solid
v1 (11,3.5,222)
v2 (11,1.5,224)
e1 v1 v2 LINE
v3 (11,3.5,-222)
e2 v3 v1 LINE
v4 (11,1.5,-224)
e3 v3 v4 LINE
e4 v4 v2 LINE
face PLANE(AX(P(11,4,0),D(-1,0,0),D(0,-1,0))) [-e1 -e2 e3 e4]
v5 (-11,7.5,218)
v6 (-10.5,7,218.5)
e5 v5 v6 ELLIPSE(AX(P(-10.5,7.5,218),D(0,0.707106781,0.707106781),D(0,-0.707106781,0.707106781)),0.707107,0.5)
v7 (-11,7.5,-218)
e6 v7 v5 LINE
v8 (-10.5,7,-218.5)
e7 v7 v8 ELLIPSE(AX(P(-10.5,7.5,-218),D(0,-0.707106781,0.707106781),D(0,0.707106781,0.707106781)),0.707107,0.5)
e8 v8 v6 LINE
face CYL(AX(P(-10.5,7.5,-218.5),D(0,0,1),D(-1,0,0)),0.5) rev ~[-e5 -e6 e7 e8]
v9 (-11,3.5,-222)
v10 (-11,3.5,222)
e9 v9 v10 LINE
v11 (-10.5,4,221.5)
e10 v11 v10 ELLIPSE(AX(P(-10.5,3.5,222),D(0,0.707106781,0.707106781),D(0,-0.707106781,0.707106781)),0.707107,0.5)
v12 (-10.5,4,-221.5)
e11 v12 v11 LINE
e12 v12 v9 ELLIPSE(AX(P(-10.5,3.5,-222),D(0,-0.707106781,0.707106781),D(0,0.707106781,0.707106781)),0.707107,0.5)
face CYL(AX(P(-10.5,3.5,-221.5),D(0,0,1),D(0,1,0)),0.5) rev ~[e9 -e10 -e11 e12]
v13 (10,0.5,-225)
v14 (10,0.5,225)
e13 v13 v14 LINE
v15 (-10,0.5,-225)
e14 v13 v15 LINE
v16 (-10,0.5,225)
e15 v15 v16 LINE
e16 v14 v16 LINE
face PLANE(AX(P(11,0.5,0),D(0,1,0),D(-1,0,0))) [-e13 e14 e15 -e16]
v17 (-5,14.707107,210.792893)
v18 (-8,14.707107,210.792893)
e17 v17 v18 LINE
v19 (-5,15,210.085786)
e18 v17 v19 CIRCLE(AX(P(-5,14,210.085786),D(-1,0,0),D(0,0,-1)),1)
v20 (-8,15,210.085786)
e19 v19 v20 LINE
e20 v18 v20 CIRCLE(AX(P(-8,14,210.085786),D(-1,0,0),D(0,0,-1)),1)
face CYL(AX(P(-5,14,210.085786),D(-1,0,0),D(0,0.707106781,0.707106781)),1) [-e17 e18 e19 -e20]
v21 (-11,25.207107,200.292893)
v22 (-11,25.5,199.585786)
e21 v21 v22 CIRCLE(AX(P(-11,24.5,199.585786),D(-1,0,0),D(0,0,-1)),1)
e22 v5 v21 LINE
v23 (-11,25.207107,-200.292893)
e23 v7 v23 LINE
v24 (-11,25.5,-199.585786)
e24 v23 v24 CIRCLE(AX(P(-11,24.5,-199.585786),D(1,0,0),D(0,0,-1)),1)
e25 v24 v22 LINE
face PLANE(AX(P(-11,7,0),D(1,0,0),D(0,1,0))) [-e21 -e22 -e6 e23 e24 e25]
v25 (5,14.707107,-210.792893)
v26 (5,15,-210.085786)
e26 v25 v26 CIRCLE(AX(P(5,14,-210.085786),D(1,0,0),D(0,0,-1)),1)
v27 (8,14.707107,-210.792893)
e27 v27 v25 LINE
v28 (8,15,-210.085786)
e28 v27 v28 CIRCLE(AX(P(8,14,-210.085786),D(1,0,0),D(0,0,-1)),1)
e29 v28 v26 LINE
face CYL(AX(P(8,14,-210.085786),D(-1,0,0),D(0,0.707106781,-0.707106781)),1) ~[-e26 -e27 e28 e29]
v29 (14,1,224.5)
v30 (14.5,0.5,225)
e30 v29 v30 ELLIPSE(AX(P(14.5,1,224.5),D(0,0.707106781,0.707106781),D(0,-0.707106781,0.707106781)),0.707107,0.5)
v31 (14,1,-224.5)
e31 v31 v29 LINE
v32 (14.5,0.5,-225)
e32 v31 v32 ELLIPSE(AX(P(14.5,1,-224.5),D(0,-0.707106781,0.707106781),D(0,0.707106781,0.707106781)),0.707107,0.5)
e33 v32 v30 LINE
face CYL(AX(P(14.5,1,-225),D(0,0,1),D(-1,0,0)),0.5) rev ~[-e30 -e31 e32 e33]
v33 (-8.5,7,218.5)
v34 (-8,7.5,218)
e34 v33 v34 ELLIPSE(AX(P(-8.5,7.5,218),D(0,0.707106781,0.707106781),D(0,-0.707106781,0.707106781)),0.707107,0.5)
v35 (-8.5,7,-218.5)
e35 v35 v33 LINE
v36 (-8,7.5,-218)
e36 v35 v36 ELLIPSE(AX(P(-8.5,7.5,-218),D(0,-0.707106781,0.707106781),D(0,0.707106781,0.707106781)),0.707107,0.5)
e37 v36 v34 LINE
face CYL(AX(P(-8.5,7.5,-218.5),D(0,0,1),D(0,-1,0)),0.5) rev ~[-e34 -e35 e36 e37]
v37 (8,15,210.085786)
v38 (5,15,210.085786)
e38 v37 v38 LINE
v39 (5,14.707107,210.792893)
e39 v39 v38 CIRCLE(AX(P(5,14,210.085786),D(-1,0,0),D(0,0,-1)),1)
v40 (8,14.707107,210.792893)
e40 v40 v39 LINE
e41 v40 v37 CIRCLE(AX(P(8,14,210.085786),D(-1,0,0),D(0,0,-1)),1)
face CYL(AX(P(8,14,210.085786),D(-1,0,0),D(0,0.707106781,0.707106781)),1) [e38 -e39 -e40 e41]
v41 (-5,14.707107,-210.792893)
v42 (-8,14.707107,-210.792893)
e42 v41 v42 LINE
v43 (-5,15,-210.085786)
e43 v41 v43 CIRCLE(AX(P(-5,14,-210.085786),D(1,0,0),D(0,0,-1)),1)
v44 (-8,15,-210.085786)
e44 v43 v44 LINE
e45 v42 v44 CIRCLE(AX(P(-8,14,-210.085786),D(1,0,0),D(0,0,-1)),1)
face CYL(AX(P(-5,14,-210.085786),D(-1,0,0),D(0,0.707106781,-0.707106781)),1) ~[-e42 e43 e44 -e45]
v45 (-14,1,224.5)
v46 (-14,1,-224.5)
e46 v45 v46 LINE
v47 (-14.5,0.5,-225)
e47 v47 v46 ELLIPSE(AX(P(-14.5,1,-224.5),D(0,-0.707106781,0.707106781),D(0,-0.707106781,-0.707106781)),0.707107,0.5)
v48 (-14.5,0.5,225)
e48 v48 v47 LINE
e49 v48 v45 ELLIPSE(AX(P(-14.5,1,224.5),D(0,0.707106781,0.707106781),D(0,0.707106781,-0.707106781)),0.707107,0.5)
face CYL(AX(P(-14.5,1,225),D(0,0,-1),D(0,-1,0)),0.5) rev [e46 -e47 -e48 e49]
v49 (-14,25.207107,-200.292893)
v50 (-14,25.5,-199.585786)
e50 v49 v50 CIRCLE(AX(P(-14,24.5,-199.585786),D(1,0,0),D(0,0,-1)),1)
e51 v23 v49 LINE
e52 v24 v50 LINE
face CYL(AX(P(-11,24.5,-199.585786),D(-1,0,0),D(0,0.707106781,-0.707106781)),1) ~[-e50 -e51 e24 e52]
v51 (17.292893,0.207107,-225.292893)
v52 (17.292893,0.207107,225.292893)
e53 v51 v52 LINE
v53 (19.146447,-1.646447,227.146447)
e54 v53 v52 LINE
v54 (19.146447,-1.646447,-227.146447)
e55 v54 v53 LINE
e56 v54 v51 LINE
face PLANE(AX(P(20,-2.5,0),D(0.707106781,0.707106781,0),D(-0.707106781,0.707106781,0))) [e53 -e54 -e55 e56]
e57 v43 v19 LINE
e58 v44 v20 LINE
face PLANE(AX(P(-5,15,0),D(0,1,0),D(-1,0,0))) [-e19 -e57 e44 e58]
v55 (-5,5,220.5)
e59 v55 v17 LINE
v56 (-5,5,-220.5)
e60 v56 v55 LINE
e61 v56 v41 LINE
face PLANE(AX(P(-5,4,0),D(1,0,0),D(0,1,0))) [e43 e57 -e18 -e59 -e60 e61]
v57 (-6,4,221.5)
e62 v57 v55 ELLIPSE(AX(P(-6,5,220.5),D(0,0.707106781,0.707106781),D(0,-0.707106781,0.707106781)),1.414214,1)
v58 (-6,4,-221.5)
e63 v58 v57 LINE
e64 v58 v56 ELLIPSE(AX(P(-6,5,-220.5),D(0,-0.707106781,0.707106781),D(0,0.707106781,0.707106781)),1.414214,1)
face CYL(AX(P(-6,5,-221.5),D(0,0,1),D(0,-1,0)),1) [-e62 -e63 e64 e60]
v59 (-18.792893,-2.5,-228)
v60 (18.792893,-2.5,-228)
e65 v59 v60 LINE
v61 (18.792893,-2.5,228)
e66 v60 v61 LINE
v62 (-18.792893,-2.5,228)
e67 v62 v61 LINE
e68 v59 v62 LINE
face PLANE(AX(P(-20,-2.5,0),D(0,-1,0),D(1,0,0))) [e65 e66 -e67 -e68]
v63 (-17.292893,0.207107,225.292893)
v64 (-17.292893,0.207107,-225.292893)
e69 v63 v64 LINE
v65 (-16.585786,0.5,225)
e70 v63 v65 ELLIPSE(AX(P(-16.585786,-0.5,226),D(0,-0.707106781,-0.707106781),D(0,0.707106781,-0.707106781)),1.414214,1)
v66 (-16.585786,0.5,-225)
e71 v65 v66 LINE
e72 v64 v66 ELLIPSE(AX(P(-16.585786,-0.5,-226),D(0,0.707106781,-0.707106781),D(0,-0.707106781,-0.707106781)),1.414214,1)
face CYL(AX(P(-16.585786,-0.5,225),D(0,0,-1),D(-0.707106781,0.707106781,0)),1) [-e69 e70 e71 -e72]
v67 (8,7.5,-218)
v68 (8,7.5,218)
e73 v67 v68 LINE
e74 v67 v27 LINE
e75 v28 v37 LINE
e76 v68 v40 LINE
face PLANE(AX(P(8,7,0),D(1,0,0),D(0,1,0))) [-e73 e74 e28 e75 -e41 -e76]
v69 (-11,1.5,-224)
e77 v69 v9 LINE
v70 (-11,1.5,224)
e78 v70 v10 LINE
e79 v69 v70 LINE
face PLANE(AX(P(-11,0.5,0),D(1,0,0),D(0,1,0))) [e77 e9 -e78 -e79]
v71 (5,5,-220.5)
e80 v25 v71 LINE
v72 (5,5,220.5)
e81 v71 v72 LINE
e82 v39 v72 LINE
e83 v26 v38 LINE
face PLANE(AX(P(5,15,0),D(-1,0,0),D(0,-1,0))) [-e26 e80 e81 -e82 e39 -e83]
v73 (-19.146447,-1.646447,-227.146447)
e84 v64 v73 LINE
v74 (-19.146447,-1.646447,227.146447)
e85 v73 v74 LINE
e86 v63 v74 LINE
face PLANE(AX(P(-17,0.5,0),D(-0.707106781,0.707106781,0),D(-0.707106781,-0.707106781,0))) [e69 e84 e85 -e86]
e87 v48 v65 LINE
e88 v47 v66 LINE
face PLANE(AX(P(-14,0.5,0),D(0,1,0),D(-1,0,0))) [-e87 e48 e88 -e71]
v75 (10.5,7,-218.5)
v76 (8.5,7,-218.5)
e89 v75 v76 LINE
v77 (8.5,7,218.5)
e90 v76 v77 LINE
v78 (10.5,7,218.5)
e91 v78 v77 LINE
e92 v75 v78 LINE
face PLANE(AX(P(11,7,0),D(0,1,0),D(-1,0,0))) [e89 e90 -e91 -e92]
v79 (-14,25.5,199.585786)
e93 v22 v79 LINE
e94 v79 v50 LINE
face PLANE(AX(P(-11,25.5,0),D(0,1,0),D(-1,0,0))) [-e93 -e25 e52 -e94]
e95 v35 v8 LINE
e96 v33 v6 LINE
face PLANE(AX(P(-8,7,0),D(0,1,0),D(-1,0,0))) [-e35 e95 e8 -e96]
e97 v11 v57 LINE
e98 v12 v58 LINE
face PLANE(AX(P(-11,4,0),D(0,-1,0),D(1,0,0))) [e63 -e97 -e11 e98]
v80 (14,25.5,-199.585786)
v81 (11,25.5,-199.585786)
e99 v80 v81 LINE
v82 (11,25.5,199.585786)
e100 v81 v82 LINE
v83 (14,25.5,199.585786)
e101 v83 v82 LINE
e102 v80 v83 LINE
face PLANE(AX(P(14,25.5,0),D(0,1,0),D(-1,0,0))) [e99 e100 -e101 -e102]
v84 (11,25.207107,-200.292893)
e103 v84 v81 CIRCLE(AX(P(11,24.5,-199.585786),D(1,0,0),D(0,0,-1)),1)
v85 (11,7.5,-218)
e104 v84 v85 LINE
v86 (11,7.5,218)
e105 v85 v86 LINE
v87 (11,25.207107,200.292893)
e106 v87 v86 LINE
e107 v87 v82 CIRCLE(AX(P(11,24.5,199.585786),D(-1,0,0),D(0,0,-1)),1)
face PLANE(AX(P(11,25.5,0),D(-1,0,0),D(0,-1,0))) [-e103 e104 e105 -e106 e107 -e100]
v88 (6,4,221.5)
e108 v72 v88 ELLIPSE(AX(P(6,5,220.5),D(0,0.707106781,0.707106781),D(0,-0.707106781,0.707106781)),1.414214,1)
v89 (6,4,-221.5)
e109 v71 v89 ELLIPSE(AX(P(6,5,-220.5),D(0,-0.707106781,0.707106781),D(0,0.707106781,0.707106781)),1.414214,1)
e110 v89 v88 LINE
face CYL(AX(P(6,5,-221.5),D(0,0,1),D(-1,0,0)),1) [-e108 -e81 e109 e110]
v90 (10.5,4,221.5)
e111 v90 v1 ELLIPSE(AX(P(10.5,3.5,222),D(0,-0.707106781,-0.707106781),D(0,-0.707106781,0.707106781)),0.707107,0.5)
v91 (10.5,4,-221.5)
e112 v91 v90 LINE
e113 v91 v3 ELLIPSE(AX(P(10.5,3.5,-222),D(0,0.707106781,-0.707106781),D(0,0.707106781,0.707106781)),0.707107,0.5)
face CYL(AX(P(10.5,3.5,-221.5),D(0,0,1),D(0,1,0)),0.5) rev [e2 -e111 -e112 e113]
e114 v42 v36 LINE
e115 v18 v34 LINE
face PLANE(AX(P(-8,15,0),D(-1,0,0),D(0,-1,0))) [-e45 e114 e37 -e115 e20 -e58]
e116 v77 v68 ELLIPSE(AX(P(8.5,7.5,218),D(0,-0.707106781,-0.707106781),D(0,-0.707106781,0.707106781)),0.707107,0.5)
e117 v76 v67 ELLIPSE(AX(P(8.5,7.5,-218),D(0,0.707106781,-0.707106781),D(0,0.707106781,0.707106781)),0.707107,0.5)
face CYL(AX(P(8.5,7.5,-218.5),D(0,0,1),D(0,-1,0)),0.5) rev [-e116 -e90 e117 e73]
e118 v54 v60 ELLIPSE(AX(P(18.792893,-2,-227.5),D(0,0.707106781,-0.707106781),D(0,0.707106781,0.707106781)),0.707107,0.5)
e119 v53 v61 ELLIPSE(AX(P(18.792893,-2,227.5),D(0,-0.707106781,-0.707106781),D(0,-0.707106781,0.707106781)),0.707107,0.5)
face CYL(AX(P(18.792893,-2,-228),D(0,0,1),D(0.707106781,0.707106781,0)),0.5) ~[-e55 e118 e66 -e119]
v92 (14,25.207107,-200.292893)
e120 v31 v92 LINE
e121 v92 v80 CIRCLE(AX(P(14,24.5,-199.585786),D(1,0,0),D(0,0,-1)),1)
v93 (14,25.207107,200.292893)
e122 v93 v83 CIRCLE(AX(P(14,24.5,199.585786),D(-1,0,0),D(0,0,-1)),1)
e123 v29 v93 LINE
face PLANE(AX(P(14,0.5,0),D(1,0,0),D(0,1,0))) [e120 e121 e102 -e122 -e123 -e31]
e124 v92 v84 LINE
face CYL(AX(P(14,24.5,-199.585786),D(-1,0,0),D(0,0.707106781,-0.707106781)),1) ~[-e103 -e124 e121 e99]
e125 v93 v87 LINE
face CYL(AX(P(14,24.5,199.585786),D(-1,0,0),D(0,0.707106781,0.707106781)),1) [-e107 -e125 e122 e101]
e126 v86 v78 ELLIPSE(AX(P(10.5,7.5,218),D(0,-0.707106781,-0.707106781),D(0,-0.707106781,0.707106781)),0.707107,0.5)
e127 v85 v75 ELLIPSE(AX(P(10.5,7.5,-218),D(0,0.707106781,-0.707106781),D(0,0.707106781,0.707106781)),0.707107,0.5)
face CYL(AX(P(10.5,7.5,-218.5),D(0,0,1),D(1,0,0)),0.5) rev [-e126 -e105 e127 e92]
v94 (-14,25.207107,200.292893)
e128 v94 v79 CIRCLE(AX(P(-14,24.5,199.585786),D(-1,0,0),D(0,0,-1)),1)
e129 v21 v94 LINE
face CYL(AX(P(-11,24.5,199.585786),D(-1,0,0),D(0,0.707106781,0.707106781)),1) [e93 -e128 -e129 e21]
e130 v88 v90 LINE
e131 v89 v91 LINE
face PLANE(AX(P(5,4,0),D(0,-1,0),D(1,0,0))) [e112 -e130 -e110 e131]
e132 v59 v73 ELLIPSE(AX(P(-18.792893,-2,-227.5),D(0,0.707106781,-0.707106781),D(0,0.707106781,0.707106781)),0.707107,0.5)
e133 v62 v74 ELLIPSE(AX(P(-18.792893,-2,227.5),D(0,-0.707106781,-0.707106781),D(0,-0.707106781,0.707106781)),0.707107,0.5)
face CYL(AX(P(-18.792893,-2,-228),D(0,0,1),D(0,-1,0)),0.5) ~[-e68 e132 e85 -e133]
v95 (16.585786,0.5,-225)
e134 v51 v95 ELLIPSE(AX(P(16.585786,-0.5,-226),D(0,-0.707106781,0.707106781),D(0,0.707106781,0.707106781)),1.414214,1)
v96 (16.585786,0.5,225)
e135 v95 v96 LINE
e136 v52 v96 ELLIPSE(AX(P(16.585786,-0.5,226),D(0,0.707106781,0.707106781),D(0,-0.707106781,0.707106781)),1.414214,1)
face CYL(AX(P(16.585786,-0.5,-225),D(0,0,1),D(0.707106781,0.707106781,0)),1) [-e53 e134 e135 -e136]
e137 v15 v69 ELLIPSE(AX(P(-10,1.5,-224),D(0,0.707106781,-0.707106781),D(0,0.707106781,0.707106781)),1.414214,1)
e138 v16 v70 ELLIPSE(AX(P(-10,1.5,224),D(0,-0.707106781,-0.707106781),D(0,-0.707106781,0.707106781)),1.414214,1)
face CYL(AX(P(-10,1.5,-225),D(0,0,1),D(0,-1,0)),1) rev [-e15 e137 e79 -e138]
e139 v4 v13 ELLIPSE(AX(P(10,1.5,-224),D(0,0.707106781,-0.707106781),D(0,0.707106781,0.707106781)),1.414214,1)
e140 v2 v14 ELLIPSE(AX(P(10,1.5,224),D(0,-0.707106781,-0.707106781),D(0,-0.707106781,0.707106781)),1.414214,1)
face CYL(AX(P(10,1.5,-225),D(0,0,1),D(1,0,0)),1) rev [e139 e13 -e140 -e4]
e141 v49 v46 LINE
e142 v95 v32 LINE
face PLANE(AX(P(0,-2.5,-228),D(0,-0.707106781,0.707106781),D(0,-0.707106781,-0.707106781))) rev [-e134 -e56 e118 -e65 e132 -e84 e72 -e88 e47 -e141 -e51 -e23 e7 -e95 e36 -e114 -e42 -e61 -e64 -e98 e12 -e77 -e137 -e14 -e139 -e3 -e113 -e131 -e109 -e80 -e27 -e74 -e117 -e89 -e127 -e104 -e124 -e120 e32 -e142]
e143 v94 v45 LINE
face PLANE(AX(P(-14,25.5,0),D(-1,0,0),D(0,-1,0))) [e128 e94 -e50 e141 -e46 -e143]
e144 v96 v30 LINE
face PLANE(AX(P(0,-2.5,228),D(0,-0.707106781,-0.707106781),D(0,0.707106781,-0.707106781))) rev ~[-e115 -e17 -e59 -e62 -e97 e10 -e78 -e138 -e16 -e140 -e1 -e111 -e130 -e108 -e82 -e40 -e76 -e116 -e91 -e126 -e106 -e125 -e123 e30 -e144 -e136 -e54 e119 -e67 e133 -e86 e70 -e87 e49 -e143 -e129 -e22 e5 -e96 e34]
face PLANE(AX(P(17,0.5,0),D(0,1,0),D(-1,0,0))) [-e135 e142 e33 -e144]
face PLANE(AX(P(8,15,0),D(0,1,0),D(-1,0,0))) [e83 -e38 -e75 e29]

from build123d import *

# Parameters (mm, degrees)
F1_DEPTH = 228
F3_DEPTH = 30
F4_R     = 1
F6_R     = 0.5
F7_R     = 0.5


# Not quite as in the source:
# - two fillets or chamfers of one size are made in one step
# - a pattern or mirror of a feature is missing from the dataset's text; its kind, count and spacing are read off the source's solid


with BuildPart() as f1:
    # F0 (on Top) → F1 (new body, symmetric)
    with BuildSketch(Plane.XY):
        Polygon((-14, 0.5), (-17, 0.5), (-20, -2.5), (20, -2.5), (17, 0.5), (14, 0.5), (11, 0.5), (-11, 0.5), align=None)
        Polygon((-14, 25.5), (-14, 0.5), (-11, 0.5), (-11, 4), (-11, 7), (-11, 25.5), align=None)
        Polygon((11, 4), (11, 0.5), (14, 0.5), (14, 25.5), (11, 25.5), (11, 7), align=None)
        Polygon((-11, 7), (-11, 4), (-5, 4), (-5, 7), (-5, 15), (-8, 15), (-8, 7), align=None)
        Polygon((5, 4), (11, 4), (11, 7), (8, 7), (8, 15), (5, 15), (5, 7), align=None)
    extrude(amount=F1_DEPTH, both=True)

    # F2 (on Right) → F3 (cut, symmetric)
    with BuildSketch(Plane.YZ):
        Polygon((25.5, 228), (0.5, 228), (-2.5, 228), (25.5, 200), align=None)
    f3 = extrude(amount=F3_DEPTH, both=True, mode=Mode.SUBTRACT)

    # F3_copies: F3 across plane
    add(f3.mirror(Plane(origin=(0, 0, 0), x_dir=(-1, 0, 0), z_dir=(0, 0, -1))), mode=Mode.SUBTRACT)

    # F4
    f4_edges = [f1.edges().sort_by_distance(p)[0] for p in [
        (17, 0.5, 0),
        (12.5, 25.5, 200),
        (-11, 0.5, 0),
        (-12.5, 25.5, 200),
        (-17, 0.5, 0),
        (11, 0.5, 0),
        (6.5, 15, 210.5),
        (-6.5, 15, 210.5),
        (12.5, 25.5, -200),
        (6.5, 15, -210.5),
        (-6.5, 15, -210.5),
        (-12.5, 25.5, -200),
        (5, 4, 0),
        (-5, 4, 0),
    ]]
    fillet(f4_edges, radius=F4_R)

    # F6
    f6_edges = [f1.edges().sort_by_distance(p)[0] for p in [
        (8, 7, 0),
        (-11, 7, 0),
        (-11, 4, 0),
        (11, 4, 0),
        (11, 7, 0),
        (-8, 7, 0),
    ]]
    fillet(f6_edges, radius=F6_R)

    # F7
    f7_edges = [f1.edges().sort_by_distance(p)[0] for p in [
        (-20, -2.5, 0),
        (20, -2.5, 0),
        (14, 0.5, 0),
        (-14, 0.5, 0),
    ]]
    fillet(f7_edges, radius=F7_R)


solid = f1.part
